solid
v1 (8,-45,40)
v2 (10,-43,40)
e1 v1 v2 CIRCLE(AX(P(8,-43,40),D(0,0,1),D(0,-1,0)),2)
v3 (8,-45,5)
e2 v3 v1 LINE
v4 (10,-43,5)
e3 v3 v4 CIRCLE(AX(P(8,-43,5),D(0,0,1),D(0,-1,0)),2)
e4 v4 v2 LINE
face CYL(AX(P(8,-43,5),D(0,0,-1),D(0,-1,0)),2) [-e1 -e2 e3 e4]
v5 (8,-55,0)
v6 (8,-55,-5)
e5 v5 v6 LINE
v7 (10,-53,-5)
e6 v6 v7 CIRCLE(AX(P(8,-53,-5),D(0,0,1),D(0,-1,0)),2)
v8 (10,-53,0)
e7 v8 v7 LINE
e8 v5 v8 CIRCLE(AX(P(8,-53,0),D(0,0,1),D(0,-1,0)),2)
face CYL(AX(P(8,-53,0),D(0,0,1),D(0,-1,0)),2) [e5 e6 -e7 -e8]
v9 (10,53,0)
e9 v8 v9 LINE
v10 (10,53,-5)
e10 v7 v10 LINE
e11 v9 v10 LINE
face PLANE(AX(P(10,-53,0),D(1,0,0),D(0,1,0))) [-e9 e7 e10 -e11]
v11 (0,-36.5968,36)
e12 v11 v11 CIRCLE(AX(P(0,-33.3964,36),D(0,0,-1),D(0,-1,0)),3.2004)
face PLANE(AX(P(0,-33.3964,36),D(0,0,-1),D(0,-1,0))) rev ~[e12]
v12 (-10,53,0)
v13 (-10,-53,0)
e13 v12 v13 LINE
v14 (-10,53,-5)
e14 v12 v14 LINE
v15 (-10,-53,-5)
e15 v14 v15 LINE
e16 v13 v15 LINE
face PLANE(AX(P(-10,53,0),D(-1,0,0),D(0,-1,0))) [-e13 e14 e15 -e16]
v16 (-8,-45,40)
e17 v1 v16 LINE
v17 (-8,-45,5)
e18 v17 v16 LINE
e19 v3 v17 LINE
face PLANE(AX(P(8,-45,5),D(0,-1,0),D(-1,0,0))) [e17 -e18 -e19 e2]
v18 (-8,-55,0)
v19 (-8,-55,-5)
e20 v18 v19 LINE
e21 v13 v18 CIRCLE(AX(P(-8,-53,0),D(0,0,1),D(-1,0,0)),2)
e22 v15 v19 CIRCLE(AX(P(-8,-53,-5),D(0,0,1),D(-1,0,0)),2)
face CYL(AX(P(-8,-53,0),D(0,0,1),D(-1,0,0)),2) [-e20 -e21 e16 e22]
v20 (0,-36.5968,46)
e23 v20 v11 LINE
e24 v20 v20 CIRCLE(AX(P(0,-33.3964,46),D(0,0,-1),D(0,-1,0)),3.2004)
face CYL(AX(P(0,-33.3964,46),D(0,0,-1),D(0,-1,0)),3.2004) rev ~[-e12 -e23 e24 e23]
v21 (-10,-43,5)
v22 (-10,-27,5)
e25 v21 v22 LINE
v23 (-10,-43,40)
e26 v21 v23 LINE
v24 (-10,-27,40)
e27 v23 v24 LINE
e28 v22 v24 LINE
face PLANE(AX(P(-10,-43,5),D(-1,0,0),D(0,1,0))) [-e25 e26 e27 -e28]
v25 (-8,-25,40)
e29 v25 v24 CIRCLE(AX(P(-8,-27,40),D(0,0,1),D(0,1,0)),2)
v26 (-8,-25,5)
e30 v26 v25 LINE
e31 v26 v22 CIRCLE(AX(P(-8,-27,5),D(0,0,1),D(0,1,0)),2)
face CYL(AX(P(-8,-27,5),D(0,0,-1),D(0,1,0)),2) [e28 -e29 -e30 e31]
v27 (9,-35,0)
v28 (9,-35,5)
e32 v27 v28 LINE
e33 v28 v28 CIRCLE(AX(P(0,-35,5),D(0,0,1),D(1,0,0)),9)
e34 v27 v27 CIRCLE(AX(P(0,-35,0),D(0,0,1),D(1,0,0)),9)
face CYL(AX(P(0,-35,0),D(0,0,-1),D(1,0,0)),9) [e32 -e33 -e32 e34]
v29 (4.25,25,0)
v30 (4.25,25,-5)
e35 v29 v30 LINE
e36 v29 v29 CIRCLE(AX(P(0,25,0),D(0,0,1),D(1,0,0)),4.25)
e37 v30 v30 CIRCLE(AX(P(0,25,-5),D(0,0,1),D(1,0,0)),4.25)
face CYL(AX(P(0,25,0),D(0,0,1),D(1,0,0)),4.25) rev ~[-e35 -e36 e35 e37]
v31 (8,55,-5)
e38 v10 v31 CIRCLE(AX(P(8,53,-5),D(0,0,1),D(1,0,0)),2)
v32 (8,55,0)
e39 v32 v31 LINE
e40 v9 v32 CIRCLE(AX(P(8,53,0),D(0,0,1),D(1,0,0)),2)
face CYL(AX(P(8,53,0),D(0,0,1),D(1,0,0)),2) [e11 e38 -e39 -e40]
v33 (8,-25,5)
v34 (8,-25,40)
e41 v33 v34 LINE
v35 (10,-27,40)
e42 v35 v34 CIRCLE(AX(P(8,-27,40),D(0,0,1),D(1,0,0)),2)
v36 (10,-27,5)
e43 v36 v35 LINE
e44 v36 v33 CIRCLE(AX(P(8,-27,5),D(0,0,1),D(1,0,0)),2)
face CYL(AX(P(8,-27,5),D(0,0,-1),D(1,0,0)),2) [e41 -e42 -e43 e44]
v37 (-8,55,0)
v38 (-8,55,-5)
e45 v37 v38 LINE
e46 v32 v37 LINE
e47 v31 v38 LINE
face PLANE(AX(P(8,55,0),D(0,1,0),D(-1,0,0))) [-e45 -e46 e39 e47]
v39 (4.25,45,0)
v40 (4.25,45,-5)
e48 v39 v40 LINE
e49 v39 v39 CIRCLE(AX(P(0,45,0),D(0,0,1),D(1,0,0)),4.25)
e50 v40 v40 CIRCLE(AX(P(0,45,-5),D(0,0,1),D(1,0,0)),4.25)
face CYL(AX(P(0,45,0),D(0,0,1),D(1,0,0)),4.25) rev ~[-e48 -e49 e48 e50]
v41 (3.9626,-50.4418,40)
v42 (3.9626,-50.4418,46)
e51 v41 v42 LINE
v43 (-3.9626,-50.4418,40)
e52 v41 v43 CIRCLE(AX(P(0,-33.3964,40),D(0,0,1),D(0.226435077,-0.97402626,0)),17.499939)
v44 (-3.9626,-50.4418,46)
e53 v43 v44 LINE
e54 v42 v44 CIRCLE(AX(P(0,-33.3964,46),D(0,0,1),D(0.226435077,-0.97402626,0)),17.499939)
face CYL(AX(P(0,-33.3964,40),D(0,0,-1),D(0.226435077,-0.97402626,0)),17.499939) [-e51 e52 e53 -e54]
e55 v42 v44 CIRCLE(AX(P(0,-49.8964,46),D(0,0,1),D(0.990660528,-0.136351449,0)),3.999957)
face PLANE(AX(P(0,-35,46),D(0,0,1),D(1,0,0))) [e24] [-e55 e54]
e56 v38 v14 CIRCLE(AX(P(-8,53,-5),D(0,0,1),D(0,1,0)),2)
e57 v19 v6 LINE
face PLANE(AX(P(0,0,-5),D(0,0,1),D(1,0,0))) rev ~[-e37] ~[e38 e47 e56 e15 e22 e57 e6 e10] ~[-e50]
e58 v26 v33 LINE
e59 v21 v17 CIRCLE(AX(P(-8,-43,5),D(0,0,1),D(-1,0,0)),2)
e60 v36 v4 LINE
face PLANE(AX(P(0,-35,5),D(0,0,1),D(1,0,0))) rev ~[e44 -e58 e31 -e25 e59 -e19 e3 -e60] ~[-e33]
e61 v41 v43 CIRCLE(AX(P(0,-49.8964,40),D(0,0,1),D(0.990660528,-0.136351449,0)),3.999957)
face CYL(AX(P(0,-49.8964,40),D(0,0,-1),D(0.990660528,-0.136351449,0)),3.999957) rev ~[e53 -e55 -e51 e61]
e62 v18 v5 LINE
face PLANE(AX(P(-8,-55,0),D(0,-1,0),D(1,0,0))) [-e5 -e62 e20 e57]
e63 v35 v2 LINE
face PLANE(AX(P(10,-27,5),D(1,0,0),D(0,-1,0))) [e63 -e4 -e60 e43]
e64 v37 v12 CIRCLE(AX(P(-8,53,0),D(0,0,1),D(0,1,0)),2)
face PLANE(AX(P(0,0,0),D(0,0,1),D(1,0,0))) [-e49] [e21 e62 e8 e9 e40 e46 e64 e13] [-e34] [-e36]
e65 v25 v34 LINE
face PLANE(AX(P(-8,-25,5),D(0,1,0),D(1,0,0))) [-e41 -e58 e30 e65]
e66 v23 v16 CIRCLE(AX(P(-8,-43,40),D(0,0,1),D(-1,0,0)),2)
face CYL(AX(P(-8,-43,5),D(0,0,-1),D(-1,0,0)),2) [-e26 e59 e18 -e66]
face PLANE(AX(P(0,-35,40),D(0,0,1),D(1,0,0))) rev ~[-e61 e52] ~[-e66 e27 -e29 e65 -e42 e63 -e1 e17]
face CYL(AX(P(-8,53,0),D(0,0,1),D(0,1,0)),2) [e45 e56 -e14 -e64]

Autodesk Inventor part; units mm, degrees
ref_plane "YZ Plane" through (0, 0, 0) normal (1, 0, 0) x (0, 1, 0)
ref_plane "XZ Plane" through (0, 0, 0) normal (0, 1, 0) x (-1, 0, 0)
ref_plane "XY Plane" through (0, 0, 0) normal (0, 0, 1) x (1, 0, 0)
sketch "Esquisse1" plane through (0, 0, 0) normal (0, 0, 1) x (1, 0, 0)
  line L0 (-8, -55) -> (8, -55)
  line L1 (10, -53) -> (10, 53)
  line L2 (8, 55) -> (-8, 55)
  line L3 (-10, 53) -> (-10, -53)
  line L4 (-10, -55) -> (10, 55) construction
  line L5 (10, -55) -> (-10, 55) construction
  arc A0 (-8, 55) -> (-10, 53) centre (-8, 53) ccw
  arc A1 (-10, -53) -> (-8, -55) centre (-8, -53) ccw
  arc A2 (8, -55) -> (10, -53) centre (8, -53) ccw
  arc A3 (10, 53) -> (8, 55) centre (8, 53) ccw
  circle A4 centre (0, 45) radius 4.25
  circle A5 centre (0, 25) radius 4.25
  point P0 (0, 0)
  dimension "d0" = 20
  dimension "d1" = 110
  dimension "d2" = 2
  dimension "d3" = 8.5
  dimension "d4" = 8.5
  dimension "d5" = 80
  dimension "d6" = 20
extrude "Extrusion1" add sketch "Esquisse1" against normal blind 5
sketch "Esquisse2" plane through (0, 0, 0) normal (0, 0, 1) x (1, 0, 0)
  circle A0 centre (0, -35) radius 9
  line L0 (-8, -55) -> (8, -55) projected
  point P0 (0, 0)
  dimension "d9" = 18
  dimension "d10" = 20
extrude "Extrusion2" add sketch "Esquisse2" along normal blind 5
sketch "Esquisse3" plane through (0, -35, 5) normal (0, 0, 1) x (1, 0, 0)
  line L0 (-8, 10) -> (8, 10)
  line L1 (10, 8) -> (10, -8)
  line L2 (8, -10) -> (-8, -10)
  line L3 (-10, -8) -> (-10, 8)
  line L4 (-10, 10) -> (10, -10) construction
  line L5 (10, 10) -> (-10, -10) construction
  arc A0 (-8, 10) -> (-10, 8) centre (-8, 8) ccw
  arc A1 (-10, -8) -> (-8, -10) centre (-8, -8) ccw
  arc A2 (8, -10) -> (10, -8) centre (8, -8) ccw
  arc A3 (10, 8) -> (8, 10) centre (8, 8) ccw
  point P0 (0, 35)
  point P1 (0, 0)
  dimension "d13" = 20
  dimension "d14" = 20
  dimension "d17" = 2
extrude "Extrusion3" add sketch "Esquisse3" along normal blind 35
sketch "Esquisse4" plane through (0, -35, 40) normal (0, 0, 1) x (1, 0, 0)
  arc A0 (3.9626, -15.4418) -> (-3.9626, -15.4418) centre (0, 1.6036) ccw
  arc A1 (3.9626, -15.4418) -> (-3.9626, -15.4418) centre (0, -14.8964) ccw
  point P0 (0, 35)
  dimension "d18" = 35
  dimension "d19" = 8
  dimension "d20" = 16.5
extrude "Extrusion4" add sketch "Esquisse4" along normal blind 6
sketch "Esquisse5" plane through (0, -35, 46) normal (0, 0, 1) x (1, 0, 0)
  arc A0 (3.9626, -15.4418) -> (-3.9626, -15.4418) centre (0, 1.6036) ccw projected
  point P0 (0, 35)
hole "Perçage1" at (0, -33.3964, 46) direction (0, 0, -1) diameter 6.4008 depth 10 counterbore diameter 12.6 counterbore depth 0 thread size "5/16-18 UNC" class "2B" standard "ANSI Unified Screw Threads"
properties part number "SupportTendeurV2"
